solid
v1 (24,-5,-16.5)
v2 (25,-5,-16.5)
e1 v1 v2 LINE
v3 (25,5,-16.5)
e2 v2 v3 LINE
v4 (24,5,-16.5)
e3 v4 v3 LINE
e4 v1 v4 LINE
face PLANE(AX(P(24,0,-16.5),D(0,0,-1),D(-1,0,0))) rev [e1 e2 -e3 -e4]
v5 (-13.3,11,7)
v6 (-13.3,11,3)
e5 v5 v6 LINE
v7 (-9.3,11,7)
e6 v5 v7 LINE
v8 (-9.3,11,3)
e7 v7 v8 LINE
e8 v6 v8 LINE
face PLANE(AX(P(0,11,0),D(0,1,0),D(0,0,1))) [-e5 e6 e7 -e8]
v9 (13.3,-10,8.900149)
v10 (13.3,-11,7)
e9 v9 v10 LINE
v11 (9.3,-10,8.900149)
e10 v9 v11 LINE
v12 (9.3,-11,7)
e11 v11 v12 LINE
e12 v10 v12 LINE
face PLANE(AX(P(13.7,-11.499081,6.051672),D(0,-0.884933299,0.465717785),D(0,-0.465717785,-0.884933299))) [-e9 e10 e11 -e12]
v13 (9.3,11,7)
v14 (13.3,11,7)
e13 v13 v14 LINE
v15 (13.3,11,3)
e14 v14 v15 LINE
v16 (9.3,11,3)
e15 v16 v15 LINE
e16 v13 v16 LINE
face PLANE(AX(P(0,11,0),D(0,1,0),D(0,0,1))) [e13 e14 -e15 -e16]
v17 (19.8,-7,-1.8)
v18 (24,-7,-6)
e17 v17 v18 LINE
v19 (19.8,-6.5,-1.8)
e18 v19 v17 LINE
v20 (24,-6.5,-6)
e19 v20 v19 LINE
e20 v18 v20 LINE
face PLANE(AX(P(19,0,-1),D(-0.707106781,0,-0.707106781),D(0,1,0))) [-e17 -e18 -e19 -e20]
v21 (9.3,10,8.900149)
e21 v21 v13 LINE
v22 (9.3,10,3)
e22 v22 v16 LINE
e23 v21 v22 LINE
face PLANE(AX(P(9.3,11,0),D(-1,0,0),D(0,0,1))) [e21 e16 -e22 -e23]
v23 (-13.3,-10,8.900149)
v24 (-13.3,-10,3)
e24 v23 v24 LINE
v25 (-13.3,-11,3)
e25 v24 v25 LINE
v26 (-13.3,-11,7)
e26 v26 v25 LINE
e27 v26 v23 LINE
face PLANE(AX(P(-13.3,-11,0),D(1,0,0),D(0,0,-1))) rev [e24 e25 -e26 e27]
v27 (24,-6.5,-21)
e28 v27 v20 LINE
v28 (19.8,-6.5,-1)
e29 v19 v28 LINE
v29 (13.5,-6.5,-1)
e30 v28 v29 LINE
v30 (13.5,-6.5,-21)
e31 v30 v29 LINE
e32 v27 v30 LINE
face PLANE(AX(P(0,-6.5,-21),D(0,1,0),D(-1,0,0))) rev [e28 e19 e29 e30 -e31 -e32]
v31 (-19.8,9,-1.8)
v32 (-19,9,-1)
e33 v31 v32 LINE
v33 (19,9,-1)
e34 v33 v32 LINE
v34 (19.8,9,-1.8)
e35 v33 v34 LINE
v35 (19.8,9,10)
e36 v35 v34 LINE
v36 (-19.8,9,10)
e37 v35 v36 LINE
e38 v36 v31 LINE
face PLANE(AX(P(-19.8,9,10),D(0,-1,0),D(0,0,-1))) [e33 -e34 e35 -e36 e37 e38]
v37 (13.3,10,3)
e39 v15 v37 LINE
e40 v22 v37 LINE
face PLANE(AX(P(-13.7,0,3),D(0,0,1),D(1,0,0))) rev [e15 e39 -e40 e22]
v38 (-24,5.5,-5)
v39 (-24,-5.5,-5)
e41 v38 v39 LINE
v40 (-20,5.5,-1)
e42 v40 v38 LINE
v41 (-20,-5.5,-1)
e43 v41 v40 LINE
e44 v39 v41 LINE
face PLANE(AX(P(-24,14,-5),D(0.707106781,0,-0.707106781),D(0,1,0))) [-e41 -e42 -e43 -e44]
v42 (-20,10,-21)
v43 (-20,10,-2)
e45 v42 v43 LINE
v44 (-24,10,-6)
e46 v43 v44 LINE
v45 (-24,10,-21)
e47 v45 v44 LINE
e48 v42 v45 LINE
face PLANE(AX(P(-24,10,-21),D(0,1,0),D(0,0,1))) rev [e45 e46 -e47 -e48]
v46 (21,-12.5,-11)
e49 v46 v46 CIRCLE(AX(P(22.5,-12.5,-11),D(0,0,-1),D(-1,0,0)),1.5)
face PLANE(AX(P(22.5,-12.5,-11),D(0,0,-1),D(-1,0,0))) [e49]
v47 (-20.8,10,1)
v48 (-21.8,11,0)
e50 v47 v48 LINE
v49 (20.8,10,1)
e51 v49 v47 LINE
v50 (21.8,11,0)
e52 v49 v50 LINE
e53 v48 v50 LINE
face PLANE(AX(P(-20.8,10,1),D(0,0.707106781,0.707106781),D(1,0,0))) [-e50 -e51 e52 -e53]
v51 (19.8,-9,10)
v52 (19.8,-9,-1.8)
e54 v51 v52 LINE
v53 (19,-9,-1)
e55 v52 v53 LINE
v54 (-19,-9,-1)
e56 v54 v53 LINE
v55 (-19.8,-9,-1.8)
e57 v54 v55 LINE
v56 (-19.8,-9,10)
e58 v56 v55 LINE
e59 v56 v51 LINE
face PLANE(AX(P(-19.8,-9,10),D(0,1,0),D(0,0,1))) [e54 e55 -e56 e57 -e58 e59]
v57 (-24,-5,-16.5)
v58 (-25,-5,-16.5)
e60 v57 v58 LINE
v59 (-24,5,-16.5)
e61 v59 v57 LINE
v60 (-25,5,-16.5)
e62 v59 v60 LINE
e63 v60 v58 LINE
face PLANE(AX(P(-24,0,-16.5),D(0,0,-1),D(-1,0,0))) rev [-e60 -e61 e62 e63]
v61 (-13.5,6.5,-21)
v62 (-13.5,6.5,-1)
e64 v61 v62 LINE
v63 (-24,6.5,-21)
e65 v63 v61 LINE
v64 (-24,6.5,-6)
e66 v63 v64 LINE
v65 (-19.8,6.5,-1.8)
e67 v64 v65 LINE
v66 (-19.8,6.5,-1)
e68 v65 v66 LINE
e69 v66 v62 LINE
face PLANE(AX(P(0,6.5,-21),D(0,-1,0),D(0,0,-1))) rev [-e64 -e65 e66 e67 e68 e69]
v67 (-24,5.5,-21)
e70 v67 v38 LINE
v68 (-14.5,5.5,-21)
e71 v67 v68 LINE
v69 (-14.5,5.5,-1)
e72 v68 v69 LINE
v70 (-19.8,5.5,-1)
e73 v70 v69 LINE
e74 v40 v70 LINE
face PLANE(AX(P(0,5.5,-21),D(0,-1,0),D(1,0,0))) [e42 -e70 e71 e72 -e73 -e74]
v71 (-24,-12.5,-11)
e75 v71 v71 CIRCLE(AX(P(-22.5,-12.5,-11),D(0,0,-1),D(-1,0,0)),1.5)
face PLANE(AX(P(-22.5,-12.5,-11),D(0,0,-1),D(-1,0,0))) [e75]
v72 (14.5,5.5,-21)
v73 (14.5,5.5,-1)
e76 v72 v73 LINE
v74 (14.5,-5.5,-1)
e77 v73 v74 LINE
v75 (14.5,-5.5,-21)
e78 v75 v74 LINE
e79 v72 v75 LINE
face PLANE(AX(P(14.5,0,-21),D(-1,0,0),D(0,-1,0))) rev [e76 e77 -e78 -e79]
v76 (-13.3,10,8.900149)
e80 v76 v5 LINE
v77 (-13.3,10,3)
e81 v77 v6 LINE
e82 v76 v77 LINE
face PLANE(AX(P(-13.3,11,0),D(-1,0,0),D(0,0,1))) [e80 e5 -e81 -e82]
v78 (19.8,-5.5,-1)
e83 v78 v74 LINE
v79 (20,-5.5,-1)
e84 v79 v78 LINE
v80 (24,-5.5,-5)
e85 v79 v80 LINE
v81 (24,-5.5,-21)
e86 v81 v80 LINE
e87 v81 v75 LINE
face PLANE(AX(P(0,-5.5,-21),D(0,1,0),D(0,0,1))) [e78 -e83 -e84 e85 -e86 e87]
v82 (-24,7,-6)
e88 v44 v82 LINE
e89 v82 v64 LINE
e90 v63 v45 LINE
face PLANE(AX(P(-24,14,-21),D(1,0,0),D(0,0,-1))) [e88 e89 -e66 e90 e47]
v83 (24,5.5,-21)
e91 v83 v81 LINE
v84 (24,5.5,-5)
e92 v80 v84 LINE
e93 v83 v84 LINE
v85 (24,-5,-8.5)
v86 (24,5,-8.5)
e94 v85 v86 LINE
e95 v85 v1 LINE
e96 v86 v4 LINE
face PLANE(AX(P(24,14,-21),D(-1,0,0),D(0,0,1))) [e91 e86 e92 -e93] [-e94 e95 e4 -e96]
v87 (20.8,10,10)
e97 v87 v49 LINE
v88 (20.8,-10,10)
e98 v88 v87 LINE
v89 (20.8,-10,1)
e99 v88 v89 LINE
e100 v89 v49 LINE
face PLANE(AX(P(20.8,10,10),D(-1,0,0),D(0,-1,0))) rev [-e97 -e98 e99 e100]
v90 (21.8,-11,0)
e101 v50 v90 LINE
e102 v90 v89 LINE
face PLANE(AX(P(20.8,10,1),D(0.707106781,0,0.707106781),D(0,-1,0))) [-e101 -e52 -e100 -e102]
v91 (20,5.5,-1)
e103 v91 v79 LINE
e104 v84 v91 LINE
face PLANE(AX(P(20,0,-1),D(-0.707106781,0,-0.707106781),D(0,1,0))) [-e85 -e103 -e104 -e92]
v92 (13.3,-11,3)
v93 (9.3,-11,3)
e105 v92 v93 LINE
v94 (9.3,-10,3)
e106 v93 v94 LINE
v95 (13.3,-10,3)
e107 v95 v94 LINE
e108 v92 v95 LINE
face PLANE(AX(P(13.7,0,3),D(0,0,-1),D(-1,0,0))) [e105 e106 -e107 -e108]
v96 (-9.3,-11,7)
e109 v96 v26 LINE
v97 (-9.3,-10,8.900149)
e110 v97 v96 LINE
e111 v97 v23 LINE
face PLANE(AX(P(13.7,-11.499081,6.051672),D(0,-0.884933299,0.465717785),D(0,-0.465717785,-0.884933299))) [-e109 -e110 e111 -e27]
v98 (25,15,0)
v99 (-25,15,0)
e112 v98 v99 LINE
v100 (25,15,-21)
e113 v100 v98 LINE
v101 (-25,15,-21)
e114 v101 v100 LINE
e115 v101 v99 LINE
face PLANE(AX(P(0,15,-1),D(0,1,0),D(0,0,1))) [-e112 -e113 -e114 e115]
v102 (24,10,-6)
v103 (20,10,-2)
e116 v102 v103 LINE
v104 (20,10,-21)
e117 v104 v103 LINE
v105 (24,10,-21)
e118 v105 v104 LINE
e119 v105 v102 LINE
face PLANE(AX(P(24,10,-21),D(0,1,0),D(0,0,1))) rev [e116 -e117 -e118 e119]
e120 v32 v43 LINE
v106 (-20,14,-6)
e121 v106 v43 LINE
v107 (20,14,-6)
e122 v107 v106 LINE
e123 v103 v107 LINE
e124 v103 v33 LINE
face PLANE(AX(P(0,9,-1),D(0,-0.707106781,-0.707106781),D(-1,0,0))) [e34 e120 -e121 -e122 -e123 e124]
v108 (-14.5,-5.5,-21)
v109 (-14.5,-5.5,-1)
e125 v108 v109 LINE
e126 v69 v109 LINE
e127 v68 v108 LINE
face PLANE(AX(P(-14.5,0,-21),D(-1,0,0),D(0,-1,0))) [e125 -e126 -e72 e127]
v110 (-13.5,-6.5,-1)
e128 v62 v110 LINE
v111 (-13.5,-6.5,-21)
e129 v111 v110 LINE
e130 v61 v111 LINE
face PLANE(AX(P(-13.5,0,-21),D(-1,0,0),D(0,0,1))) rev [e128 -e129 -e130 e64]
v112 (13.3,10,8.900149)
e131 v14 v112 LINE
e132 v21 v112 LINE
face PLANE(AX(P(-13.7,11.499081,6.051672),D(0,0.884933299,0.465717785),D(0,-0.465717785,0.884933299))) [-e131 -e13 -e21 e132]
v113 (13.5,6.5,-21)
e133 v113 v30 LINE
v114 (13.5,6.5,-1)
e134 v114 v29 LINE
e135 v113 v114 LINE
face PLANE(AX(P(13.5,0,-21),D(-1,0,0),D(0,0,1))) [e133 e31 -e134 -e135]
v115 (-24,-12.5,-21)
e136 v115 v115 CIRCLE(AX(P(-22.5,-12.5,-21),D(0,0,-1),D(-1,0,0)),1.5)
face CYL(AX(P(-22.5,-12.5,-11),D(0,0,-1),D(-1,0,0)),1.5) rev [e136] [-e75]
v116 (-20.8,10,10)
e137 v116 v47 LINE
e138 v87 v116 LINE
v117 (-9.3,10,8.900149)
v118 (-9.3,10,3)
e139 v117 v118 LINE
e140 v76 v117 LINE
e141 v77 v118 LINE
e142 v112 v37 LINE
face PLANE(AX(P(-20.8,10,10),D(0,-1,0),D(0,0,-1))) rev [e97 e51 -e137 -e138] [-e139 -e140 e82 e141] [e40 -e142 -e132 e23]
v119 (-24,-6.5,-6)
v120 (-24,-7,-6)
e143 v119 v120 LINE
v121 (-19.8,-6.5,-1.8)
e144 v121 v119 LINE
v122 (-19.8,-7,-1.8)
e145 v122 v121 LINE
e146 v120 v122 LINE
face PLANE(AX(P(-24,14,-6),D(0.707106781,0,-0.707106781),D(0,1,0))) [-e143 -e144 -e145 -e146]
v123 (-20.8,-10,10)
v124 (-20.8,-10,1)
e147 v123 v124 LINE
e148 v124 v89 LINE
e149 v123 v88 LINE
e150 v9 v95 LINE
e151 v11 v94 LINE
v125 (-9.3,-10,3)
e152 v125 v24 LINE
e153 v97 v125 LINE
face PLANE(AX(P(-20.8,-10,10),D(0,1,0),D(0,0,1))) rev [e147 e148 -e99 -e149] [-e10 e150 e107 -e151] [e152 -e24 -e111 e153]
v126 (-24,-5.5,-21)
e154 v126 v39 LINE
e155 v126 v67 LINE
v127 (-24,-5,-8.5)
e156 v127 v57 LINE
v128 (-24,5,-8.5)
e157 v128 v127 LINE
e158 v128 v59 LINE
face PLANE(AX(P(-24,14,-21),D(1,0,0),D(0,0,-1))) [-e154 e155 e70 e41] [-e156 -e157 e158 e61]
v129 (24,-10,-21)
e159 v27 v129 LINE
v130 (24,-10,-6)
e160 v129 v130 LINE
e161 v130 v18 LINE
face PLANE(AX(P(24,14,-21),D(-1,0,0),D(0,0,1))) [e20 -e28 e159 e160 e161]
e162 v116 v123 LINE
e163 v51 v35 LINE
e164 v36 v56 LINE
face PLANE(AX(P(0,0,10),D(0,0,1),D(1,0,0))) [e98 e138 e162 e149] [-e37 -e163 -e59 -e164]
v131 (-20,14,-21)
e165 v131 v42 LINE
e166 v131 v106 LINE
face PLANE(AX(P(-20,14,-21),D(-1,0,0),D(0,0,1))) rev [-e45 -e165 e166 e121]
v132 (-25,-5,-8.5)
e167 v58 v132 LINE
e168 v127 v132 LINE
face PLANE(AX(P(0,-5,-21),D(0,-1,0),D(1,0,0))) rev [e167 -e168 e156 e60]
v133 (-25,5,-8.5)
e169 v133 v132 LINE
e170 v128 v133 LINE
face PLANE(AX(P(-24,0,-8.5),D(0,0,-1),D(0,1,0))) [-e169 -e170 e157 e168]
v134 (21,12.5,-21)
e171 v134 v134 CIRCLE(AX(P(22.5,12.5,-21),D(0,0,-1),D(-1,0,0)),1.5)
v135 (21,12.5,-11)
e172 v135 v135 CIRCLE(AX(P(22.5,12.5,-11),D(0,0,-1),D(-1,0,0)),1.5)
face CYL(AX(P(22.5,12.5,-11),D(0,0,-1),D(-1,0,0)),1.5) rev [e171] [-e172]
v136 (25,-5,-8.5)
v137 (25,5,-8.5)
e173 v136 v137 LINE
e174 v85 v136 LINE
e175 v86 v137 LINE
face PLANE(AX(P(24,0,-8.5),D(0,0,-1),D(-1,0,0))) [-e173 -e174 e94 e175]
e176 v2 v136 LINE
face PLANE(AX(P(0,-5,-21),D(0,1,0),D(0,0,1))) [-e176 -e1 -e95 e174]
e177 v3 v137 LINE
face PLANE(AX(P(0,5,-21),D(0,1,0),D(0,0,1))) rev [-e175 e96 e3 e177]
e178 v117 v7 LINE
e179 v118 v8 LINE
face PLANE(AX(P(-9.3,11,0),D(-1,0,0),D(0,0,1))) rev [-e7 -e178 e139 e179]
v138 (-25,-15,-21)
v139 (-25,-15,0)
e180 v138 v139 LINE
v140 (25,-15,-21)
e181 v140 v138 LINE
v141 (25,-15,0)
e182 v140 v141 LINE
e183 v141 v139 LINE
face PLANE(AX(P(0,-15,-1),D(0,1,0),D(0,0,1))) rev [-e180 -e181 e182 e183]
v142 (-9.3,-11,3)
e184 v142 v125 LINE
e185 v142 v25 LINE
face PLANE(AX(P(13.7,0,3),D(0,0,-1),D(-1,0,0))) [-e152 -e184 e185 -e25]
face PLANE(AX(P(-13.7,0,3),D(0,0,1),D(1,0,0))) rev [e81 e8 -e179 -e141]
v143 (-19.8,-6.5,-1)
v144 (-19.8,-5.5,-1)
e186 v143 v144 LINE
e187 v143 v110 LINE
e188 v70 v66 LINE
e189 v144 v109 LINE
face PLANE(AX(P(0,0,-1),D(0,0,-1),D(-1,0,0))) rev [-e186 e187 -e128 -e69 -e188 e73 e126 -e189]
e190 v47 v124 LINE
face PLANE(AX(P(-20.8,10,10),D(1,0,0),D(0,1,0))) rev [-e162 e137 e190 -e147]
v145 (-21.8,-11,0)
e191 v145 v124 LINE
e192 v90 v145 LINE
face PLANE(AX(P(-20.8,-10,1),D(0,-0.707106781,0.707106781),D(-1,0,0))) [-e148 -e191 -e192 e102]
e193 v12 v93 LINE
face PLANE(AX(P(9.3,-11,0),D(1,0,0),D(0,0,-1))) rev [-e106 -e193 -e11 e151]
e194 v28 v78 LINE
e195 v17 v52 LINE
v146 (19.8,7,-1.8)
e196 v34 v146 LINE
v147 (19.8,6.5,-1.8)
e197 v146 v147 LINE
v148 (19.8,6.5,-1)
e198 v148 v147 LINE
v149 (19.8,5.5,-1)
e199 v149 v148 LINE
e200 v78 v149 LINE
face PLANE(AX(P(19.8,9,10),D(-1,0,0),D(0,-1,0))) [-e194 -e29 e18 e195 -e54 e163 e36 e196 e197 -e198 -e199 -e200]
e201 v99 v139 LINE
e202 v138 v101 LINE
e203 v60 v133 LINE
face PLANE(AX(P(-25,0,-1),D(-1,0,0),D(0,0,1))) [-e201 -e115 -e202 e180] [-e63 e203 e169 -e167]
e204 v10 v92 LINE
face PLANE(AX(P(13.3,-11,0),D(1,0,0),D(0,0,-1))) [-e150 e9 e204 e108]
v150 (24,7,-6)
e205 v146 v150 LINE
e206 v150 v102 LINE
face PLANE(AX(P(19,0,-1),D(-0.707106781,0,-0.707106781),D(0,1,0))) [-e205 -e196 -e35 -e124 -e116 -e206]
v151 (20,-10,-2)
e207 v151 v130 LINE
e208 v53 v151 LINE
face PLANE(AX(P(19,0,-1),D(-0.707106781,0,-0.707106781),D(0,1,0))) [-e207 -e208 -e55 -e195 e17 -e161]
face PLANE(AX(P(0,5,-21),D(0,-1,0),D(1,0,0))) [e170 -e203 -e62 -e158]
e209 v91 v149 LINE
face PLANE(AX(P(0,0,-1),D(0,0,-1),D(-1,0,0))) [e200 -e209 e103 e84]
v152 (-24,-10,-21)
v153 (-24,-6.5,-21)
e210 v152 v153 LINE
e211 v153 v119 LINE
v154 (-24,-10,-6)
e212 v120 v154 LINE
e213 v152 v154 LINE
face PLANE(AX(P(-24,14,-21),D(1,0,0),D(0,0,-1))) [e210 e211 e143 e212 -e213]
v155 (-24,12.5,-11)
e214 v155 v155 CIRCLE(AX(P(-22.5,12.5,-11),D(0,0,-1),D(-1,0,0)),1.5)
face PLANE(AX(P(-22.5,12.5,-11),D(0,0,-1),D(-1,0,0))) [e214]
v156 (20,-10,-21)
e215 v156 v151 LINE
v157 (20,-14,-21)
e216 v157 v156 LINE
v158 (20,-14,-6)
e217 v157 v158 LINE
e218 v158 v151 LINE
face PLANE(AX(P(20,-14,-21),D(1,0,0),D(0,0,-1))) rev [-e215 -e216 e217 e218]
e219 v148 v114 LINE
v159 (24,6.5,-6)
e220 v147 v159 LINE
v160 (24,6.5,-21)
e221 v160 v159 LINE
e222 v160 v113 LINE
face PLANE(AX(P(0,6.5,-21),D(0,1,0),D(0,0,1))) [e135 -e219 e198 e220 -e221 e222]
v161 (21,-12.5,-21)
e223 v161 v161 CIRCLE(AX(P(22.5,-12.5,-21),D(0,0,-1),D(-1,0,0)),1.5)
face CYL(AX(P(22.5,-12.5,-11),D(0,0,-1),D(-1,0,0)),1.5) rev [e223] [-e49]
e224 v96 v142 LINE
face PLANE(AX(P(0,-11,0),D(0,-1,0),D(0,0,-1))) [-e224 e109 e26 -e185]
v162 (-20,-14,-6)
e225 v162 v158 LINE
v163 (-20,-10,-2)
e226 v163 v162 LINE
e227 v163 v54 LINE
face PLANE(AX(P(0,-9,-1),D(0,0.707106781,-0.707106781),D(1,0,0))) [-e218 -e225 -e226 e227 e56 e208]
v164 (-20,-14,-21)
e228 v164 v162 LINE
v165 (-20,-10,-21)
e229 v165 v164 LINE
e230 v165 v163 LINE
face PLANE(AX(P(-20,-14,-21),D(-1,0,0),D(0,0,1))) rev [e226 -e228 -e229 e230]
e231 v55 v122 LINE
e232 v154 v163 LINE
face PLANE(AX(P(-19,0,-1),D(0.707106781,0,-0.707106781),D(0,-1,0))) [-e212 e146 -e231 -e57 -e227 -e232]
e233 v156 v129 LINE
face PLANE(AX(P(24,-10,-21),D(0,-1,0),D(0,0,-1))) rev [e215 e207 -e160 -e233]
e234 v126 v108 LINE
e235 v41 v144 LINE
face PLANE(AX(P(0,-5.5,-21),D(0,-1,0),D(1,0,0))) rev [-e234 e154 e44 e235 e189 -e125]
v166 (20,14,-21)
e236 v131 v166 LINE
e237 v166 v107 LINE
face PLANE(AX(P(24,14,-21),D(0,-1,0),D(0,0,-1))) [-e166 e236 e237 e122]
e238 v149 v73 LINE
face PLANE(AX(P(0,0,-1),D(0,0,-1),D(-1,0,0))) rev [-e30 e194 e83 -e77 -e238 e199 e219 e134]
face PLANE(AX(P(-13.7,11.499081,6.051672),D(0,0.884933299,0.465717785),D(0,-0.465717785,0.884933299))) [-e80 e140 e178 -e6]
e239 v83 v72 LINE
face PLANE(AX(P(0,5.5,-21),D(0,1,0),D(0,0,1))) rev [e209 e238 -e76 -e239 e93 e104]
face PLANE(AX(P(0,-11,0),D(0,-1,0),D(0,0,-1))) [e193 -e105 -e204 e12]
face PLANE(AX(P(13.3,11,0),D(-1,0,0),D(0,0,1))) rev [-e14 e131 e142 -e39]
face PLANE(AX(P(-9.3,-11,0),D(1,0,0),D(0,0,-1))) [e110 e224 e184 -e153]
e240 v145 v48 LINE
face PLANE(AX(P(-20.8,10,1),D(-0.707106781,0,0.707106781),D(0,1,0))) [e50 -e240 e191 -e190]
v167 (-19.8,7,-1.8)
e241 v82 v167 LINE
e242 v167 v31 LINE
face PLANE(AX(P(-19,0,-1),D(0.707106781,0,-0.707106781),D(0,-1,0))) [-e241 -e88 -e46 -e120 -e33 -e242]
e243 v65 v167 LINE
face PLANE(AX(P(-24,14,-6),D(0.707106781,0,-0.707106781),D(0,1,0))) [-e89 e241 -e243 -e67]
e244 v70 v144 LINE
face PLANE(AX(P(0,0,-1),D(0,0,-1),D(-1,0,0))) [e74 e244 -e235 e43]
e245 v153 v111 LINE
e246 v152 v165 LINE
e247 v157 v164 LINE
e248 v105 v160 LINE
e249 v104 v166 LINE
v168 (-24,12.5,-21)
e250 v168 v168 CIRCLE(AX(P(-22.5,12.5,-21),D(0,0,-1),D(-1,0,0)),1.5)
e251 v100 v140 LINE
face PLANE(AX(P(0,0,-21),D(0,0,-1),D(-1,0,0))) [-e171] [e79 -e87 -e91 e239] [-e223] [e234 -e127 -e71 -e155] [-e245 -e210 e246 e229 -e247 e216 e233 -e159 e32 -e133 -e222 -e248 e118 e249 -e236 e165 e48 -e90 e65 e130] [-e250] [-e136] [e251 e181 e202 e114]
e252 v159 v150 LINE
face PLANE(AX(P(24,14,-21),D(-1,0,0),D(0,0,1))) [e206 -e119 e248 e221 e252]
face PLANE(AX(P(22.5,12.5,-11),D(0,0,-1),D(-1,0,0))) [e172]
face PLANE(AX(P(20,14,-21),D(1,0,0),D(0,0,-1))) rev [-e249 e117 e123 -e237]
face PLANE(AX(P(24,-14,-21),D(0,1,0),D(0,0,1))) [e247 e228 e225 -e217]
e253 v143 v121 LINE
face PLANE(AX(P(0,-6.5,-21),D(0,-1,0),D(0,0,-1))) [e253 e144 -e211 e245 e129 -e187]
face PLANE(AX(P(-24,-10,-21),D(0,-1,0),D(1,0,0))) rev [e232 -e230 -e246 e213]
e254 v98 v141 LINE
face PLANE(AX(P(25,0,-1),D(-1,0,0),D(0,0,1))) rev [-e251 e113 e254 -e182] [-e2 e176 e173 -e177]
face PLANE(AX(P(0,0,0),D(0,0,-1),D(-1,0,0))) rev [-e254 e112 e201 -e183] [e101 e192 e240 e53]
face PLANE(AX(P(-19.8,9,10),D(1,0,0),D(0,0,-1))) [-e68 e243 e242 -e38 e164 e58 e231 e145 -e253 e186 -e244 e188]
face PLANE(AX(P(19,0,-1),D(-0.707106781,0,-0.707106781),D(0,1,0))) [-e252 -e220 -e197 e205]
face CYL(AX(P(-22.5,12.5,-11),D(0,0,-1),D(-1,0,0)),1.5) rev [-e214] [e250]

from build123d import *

# Parameters (mm, degrees)
SKETCH1_W            = 41.6
SKETCH1_H            = 20
SKETCH1_W_2          = 39.6
SKETCH1_H_2          = 18
BOSS_EXTRUDE2_DEPTH  = 10
SKETCH2_W            = 4
SKETCH2_H            = 10
BOSS_EXTRUDE3_DEPTH  = 1
SKETCH3_W            = 3
SKETCH3_H            = 1
CUT_EXTRUDE1_DEPTH   = 27
SKETCH4_W            = 4
SKETCH4_H            = 10
BOSS_EXTRUDE4_DEPTH  = 1
SKETCH5_W            = 3
SKETCH5_H            = 1
CUT_EXTRUDE2_DEPTH   = 27
SKETCH6_W            = 50
SKETCH6_H            = 30
SKETCH6_W_2          = 41.6
SKETCH6_H_2          = 20
SKETCH6_W_3          = 39.6
SKETCH6_H_3          = 18
BOSS_EXTRUDE6_DEPTH  = 1
CHAMFER1_SIZE        = 1
SKETCH7_W            = 50
SKETCH7_H            = 30
SKETCH7_W_2          = 48
SKETCH7_H_2          = 28
BOSS_EXTRUDE7_DEPTH  = 20
SKETCH8_W            = 4.2
SKETCH8_H            = 1
BOSS_EXTRUDE8_DEPTH  = 20
SKETCH9_W            = 4.2
SKETCH9_H            = 1
BOSS_EXTRUDE9_DEPTH  = 20
SKETCH10_W           = 4
SKETCH10_H           = 4
BOSS_EXTRUDE10_DEPTH = 20
SKETCH11_W           = 2
SKETCH11_H           = 10
CUT_EXTRUDE3_DEPTH   = 1
SKETCH12_W           = 2
SKETCH12_H           = 10
CUT_EXTRUDE4_DEPTH   = 1
SKETCH13_R           = 1.5
CUT_EXTRUDE5_DEPTH   = 10
CHAMFER2_SIZE        = 5
CHAMFER3_SIZE        = 5
CHAMFER4_SIZE        = 4
SKETCH17_W           = 20
SKETCH17_H           = 14
CUT_EXTRUDE8_DEPTH   = 10
SKETCH18_W           = 4.2
SKETCH18_H           = 1
BOSS_EXTRUDE11_DEPTH = 20
CHAMFER5_SIZE        = 5
CHAMFER6_SIZE        = 5
CHAMFER7_SIZE        = 4
SKETCH19_W           = 20
SKETCH19_H           = 14
CUT_EXTRUDE9_DEPTH   = 10
SKETCH20_W           = 4.2
SKETCH20_H           = 1
BOSS_EXTRUDE12_DEPTH = 20
CHAMFER8_SIZE        = 4
CHAMFER9_SIZE        = 5


# Some blends are built 0.0001 mm under size
with BuildPart() as part:
    # Sketch1 → Boss-Extrude2 (new body)
    with BuildSketch(Plane.XY):
        Rectangle(SKETCH1_W, SKETCH1_H)
        Rectangle(SKETCH1_W_2, SKETCH1_H_2, mode=Mode.SUBTRACT)
    extrude(amount=BOSS_EXTRUDE2_DEPTH)

    # Sketch2 → Boss-Extrude3 (add)
    with BuildSketch(Plane.XZ.offset(10)):
        with Locations((-11.3, 5)):
            Rectangle(SKETCH2_W, SKETCH2_H)
        with Locations((11.3, 5)):
            Rectangle(SKETCH2_W, SKETCH2_H)
    extrude(amount=BOSS_EXTRUDE3_DEPTH)

    # Sketch3 → Cut-Extrude1 (cut)
    with BuildSketch(Plane.ZY.offset(13.3)):
        Polygon((8.900149248, -10), (7, -11), (10, -11), (10, -10), align=None)
        with Locations((1.5, -10.5)):
            Rectangle(SKETCH3_W, SKETCH3_H)
    extrude(amount=-CUT_EXTRUDE1_DEPTH, mode=Mode.SUBTRACT)

    # Sketch4 → Boss-Extrude4 (add)
    with BuildSketch(Plane(origin=(0, 10, 0), x_dir=(1, 0, 0), z_dir=(0, 1, 0))):
        with Locations((11.3, -5)):
            Rectangle(SKETCH4_W, SKETCH4_H)
        with Locations((-11.3, -5)):
            Rectangle(SKETCH4_W, SKETCH4_H)
    extrude(amount=BOSS_EXTRUDE4_DEPTH)

    # Sketch5 → Cut-Extrude2 (cut)
    with BuildSketch(Plane(origin=(13.3, 0, 0), x_dir=(0, 0, -1), z_dir=(1, 0, 0))):
        Polygon((-7, 11), (-10, 11), (-10, 10), (-8.900149248, 10), align=None)
        with Locations((-1.5, 10.5)):
            Rectangle(SKETCH5_W, SKETCH5_H)
    extrude(amount=-CUT_EXTRUDE2_DEPTH, mode=Mode.SUBTRACT)

    # Sketch6 → Boss-Extrude6 (add)
    # profile 1 of 2: a face of its own
    with BuildSketch(Plane(origin=(0, 0, 0), x_dir=(-1, 0, 0), z_dir=(0, 0, -1))):
        Rectangle(SKETCH6_W, SKETCH6_H)
        Rectangle(SKETCH6_W_2, SKETCH6_H_2, mode=Mode.SUBTRACT)
    # profile 2 of 2: a face of its own
    with BuildSketch(Plane(origin=(0, 0, 0), x_dir=(-1, 0, 0), z_dir=(0, 0, -1))):
        Rectangle(SKETCH6_W_2, SKETCH6_H_2)
        Rectangle(SKETCH6_W_3, SKETCH6_H_3, mode=Mode.SUBTRACT)
    extrude(amount=BOSS_EXTRUDE6_DEPTH)

    # Chamfer1
    chamfer1_edges = [part.edges().sort_by_distance(p)[0] for p in [
        (0, -10, 0),
        (-20.8, 0, 0),
        (0, 10, 0),
        (20.8, 0, 0),
    ]]
    chamfer(chamfer1_edges, length=CHAMFER1_SIZE)

    # Sketch7 → Boss-Extrude7 (add)
    with BuildSketch(Plane(origin=(0, 0, -1), x_dir=(-1, 0, 0), z_dir=(0, 0, -1))):
        Rectangle(SKETCH7_W, SKETCH7_H)
        Rectangle(SKETCH7_W_2, SKETCH7_H_2, mode=Mode.SUBTRACT)
    extrude(amount=BOSS_EXTRUDE7_DEPTH)

    # Sketch8 → Boss-Extrude8 (add)
    with BuildSketch(Plane(origin=(0, 0, -1), x_dir=(-1, 0, 0), z_dir=(0, 0, -1))):
        Polygon((-15, -5), (-19.8, -5), (-19.8, -6), (-14, -6), (-14, 6), (-19.8, 6), (-19.8, 5), (-15, 5), align=None)
        with Locations((-21.9, 5.5)):
            Rectangle(SKETCH8_W, SKETCH8_H)
        with Locations((-21.9, -5.5)):
            Rectangle(SKETCH8_W, SKETCH8_H)
    extrude(amount=BOSS_EXTRUDE8_DEPTH)

    # Sketch9 → Boss-Extrude9 (add)
    with BuildSketch(Plane(origin=(0, 0, -1), x_dir=(-1, 0, 0), z_dir=(0, 0, -1))):
        Polygon((15, 5), (19.8, 5), (19.8, 6), (14, 6), (14, -6), (19.8, -6), (19.8, -5), (15, -5), align=None)
        with Locations((21.9, 5.5)):
            Rectangle(SKETCH9_W, SKETCH9_H)
        with Locations((21.9, -5.5)):
            Rectangle(SKETCH9_W, SKETCH9_H)
    extrude(amount=BOSS_EXTRUDE9_DEPTH)

    # Sketch10 → Boss-Extrude10 (add)
    with BuildSketch(Plane(origin=(0, 0, -1), x_dir=(-1, 0, 0), z_dir=(0, 0, -1))):
        with Locations((-22, 12)):
            Rectangle(SKETCH10_W, SKETCH10_H)
        with Locations((22, 12)):
            Rectangle(SKETCH10_W, SKETCH10_H)
        with Locations((22, -12)):
            Rectangle(SKETCH10_W, SKETCH10_H)
        with Locations((-22, -12)):
            Rectangle(SKETCH10_W, SKETCH10_H)
    extrude(amount=BOSS_EXTRUDE10_DEPTH)

    # Sketch11 → Cut-Extrude3 (cut)
    with BuildSketch(Plane.ZY.offset(25)):
        Polygon((-10.5, -5), (-10.5, 5), (-16.5, 5), (-16.5, 0), (-16.5, -5), align=None)
        with Locations((-9.5, 0)):
            Rectangle(SKETCH11_W, SKETCH11_H)
    extrude(amount=-CUT_EXTRUDE3_DEPTH, mode=Mode.SUBTRACT)

    # Sketch12 → Cut-Extrude4 (cut)
    with BuildSketch(Plane(origin=(25, 0, 0), x_dir=(0, 0, -1), z_dir=(1, 0, 0))):
        with Locations((9.5, 0)):
            Rectangle(SKETCH12_W, SKETCH12_H)
        Polygon((16.5, 5), (10.5, 5), (10.5, -5), (16.5, -5), (16.5, 0), align=None)
    extrude(amount=-CUT_EXTRUDE4_DEPTH, mode=Mode.SUBTRACT)

    # Sketch13 → Cut-Extrude5 (cut)
    with BuildSketch(Plane(origin=(0, 0, -21), x_dir=(-1, 0, 0), z_dir=(0, 0, -1))):
        with Locations((-22.5, 12.5)):
            Circle(SKETCH13_R)
        with Locations((22.5, 12.5)):
            Circle(SKETCH13_R)
        with Locations((22.5, -12.5)):
            Circle(SKETCH13_R)
        with Locations((-22.5, -12.5)):
            Circle(SKETCH13_R)
    extrude(amount=-CUT_EXTRUDE5_DEPTH, mode=Mode.SUBTRACT)

    # Chamfer2
    chamfer2_edges = [part.edges().sort_by_distance(p)[0] for p in [
        (0, -14, -1),
        (0, 14, -1),
    ]]
    chamfer(chamfer2_edges, length=CHAMFER2_SIZE - 0.0001)  # a hair under: the kernel refuses the full size

    # Chamfer3
    # the kernel refuses this chamfer: 5 mm, written as the material it adds along each edge
    with BuildSketch(Plane(origin=(24, -21.85851494, -1), x_dir=(-0.9996219169112968, 0, 0.02749587661058636), z_dir=(0, 1, 0))) as chamfer3_piece_1_section:
        Polygon((CHAMFER3_SIZE * 0.999621916911, -CHAMFER3_SIZE * 0.0274958766106), (-CHAMFER3_SIZE * 0.0274958766106, -CHAMFER3_SIZE * 0.999621916911), (0, 0), align=None)
    chamfer3_piece_1 = extrude(amount=28.71692988, mode=Mode.PRIVATE)
    chamfer3_piece_1 = split(chamfer3_piece_1, bisect_by=Plane(origin=(19.8, -10.000025, -1.99995), z_dir=(1, 0, 0)), keep=Keep.TOP, mode=Mode.PRIVATE)
    chamfer3_piece_1 = split(chamfer3_piece_1, bisect_by=Plane(origin=(19.999975, -5, -1.99995), z_dir=(0, -1, 0)), keep=Keep.TOP, mode=Mode.PRIVATE)
    chamfer3_piece_1 = split(chamfer3_piece_1, bisect_by=Plane(origin=(19.999975, -10.0000375, -1.9999375), z_dir=(0, 0.7071067811865476, -0.7071067811865476)), keep=Keep.TOP, mode=Mode.PRIVATE)
    add(chamfer3_piece_1)
    with BuildSketch(Plane(origin=(24, -21.85851494, -1), x_dir=(-0.9996219169112968, 0, 0.02749587661058636), z_dir=(0, 1, 0))) as chamfer3_piece_2_section:
        Polygon((CHAMFER3_SIZE * 0.999621916911, -CHAMFER3_SIZE * 0.0274958766106), (-CHAMFER3_SIZE * 0.0274958766106, -CHAMFER3_SIZE * 0.999621916911), (0, 0), align=None)
    chamfer3_piece_2 = extrude(amount=28.71692988, mode=Mode.PRIVATE)
    chamfer3_piece_2 = split(chamfer3_piece_2, bisect_by=Plane(origin=(19.599975009, -9, -1.399950019), z_dir=(0, -1, 0)), keep=Keep.TOP, mode=Mode.PRIVATE)
    chamfer3_piece_2 = split(chamfer3_piece_2, bisect_by=Plane(origin=(19.599975009, -9.300037514, -1.299937514), z_dir=(0, 0.7071067811865476, -0.7071067811865476)), keep=Keep.TOP, mode=Mode.PRIVATE)
    add(chamfer3_piece_2)
    with BuildSketch(Plane(origin=(24, -21.85851494, -1), x_dir=(-0.9996219169112968, 0, 0.02749587661058636), z_dir=(0, 1, 0))) as chamfer3_piece_3_section:
        Polygon((CHAMFER3_SIZE * 0.999621916911, -CHAMFER3_SIZE * 0.0274958766106), (-CHAMFER3_SIZE * 0.0274958766106, -CHAMFER3_SIZE * 0.999621916911), (0, 0), align=None)
    chamfer3_piece_3 = extrude(amount=28.71692988, mode=Mode.PRIVATE)
    chamfer3_piece_3 = split(chamfer3_piece_3, bisect_by=Plane(origin=(19.8, 6.42920747, -1.451851852), z_dir=(1, 0, 0)), keep=Keep.TOP, mode=Mode.PRIVATE)
    chamfer3_piece_3 = split(chamfer3_piece_3, bisect_by=Plane(origin=(19.903703704, 5, -1.451851852), z_dir=(0, 1, 0)), keep=Keep.TOP, mode=Mode.PRIVATE)
    add(chamfer3_piece_3)
    with BuildSketch(Plane(origin=(-24, 6.85841494, -1), x_dir=(0.9996219169112968, 0, 0.02749587661058636), z_dir=(0, -1, 0))) as chamfer3_piece_4_section:
        Polygon((CHAMFER3_SIZE * 0.999621916911, -CHAMFER3_SIZE * 0.0274958766106), (-CHAMFER3_SIZE * 0.0274958766106, -CHAMFER3_SIZE * 0.999621916911), (0, 0), align=None)
    chamfer3_piece_4 = extrude(amount=28.71692988, mode=Mode.PRIVATE)
    chamfer3_piece_4 = split(chamfer3_piece_4, bisect_by=Plane(origin=(-19.8, 6.42920747, -1.451851852), z_dir=(-1, 0, 0)), keep=Keep.TOP, mode=Mode.PRIVATE)
    chamfer3_piece_4 = split(chamfer3_piece_4, bisect_by=Plane(origin=(-19.903703704, 5, -1.451851852), z_dir=(0, 1, 0)), keep=Keep.TOP, mode=Mode.PRIVATE)
    add(chamfer3_piece_4)
    with BuildSketch(Plane(origin=(-24, -6, -1), x_dir=(0.9996219169112968, 0, 0.02749587661058636), z_dir=(0, -1, 0))) as chamfer3_piece_5_section:
        Polygon((CHAMFER3_SIZE * 0.999621916911, -CHAMFER3_SIZE * 0.0274958766106), (-CHAMFER3_SIZE * 0.0274958766106, -CHAMFER3_SIZE * 0.999621916911), (0, 0), align=None)
    chamfer3_piece_5 = extrude(amount=15.85851494, mode=Mode.PRIVATE)
    chamfer3_piece_5 = split(chamfer3_piece_5, bisect_by=Plane(origin=(-19.8, -7.5, -1.451851852), z_dir=(-1, 0, 0)), keep=Keep.TOP, mode=Mode.PRIVATE)
    chamfer3_piece_5 = split(chamfer3_piece_5, bisect_by=Plane(origin=(-19.903703704, -8.475975926, -0.475875926), z_dir=(0, 0.7071067811865476, -0.7071067811865476)), keep=Keep.TOP, mode=Mode.PRIVATE)
    add(chamfer3_piece_5)
    with BuildSketch(Plane(origin=(-24, 6.85841494, -1), x_dir=(0.9996219169112968, 0, 0.02749587661058636), z_dir=(0, -1, 0))) as chamfer3_piece_6_section:
        Polygon((CHAMFER3_SIZE * 0.999621916911, -CHAMFER3_SIZE * 0.0274958766106), (-CHAMFER3_SIZE * 0.0274958766106, -CHAMFER3_SIZE * 0.999621916911), (0, 0), align=None)
    chamfer3_piece_6 = extrude(amount=28.71692988, mode=Mode.PRIVATE)
    chamfer3_piece_6 = split(chamfer3_piece_6, bisect_by=Plane(origin=(-19.599975009, -9, -1.399950019), z_dir=(0, -1, 0)), keep=Keep.TOP, mode=Mode.PRIVATE)
    chamfer3_piece_6 = split(chamfer3_piece_6, bisect_by=Plane(origin=(-19.599975009, -9.300037514, -1.299937514), z_dir=(0, 0.7071067811865476, -0.7071067811865476)), keep=Keep.TOP, mode=Mode.PRIVATE)
    add(chamfer3_piece_6)
    with BuildSketch(Plane(origin=(-24, 21.85851494, -1), x_dir=(0.9996219169112968, 0, 0.02749587661058636), z_dir=(0, -1, 0))) as chamfer3_piece_7_section:
        Polygon((CHAMFER3_SIZE * 0.999621916911, -CHAMFER3_SIZE * 0.0274958766106), (-CHAMFER3_SIZE * 0.0274958766106, -CHAMFER3_SIZE * 0.999621916911), (0, 0), align=None)
    chamfer3_piece_7 = extrude(amount=28.71692988, mode=Mode.PRIVATE)
    chamfer3_piece_7 = split(chamfer3_piece_7, bisect_by=Plane(origin=(-19.8, 10.000025, -1.99995), z_dir=(-1, 0, 0)), keep=Keep.TOP, mode=Mode.PRIVATE)
    chamfer3_piece_7 = split(chamfer3_piece_7, bisect_by=Plane(origin=(-19.999975, 15, -1.99995), z_dir=(0, -1, 0)), keep=Keep.TOP, mode=Mode.PRIVATE)
    chamfer3_piece_7 = split(chamfer3_piece_7, bisect_by=Plane(origin=(-19.999975, 5, -1.99995), z_dir=(0, 1, 0)), keep=Keep.TOP, mode=Mode.PRIVATE)
    add(chamfer3_piece_7)
    with BuildSketch(Plane(origin=(-24, 21.85851494, -1), x_dir=(0.9996219169112968, 0, 0.02749587661058636), z_dir=(0, -1, 0))) as chamfer3_piece_8_section:
        Polygon((CHAMFER3_SIZE * 0.999621916911, -CHAMFER3_SIZE * 0.0274958766106), (-CHAMFER3_SIZE * 0.0274958766106, -CHAMFER3_SIZE * 0.999621916911), (0, 0), align=None)
    chamfer3_piece_8 = extrude(amount=28.71692988, mode=Mode.PRIVATE)
    chamfer3_piece_8 = split(chamfer3_piece_8, bisect_by=Plane(origin=(-19.599975009, 9, -1.399950019), z_dir=(0, 1, 0)), keep=Keep.TOP, mode=Mode.PRIVATE)
    chamfer3_piece_8 = split(chamfer3_piece_8, bisect_by=Plane(origin=(-19.599975009, 15, -1.399950019), z_dir=(0, -1, 0)), keep=Keep.TOP, mode=Mode.PRIVATE)
    add(chamfer3_piece_8)
    with BuildSketch(Plane(origin=(-24, 21.85851494, -1), x_dir=(0.9996219169112968, 0, 0.02749587661058636), z_dir=(0, -1, 0))) as chamfer3_piece_9_section:
        Polygon((CHAMFER3_SIZE * 0.999621916911, -CHAMFER3_SIZE * 0.0274958766106), (-CHAMFER3_SIZE * 0.0274958766106, -CHAMFER3_SIZE * 0.999621916911), (0, 0), align=None)
    chamfer3_piece_9 = extrude(amount=28.71692988, mode=Mode.PRIVATE)
    chamfer3_piece_9 = split(chamfer3_piece_9, bisect_by=Plane(origin=(-19.8, -6.42920747, -1.451851852), z_dir=(-1, 0, 0)), keep=Keep.TOP, mode=Mode.PRIVATE)
    chamfer3_piece_9 = split(chamfer3_piece_9, bisect_by=Plane(origin=(-19.903703704, -6, -1.451851852), z_dir=(0, -1, 0)), keep=Keep.TOP, mode=Mode.PRIVATE)
    add(chamfer3_piece_9)
    with BuildSketch(Plane(origin=(24, -6.85841494, -1), x_dir=(-0.9996219169112968, 0, 0.02749587661058636), z_dir=(0, 1, 0))) as chamfer3_piece_10_section:
        Polygon((CHAMFER3_SIZE * 0.999621916911, -CHAMFER3_SIZE * 0.0274958766106), (-CHAMFER3_SIZE * 0.0274958766106, -CHAMFER3_SIZE * 0.999621916911), (0, 0), align=None)
    chamfer3_piece_10 = extrude(amount=28.71692988, mode=Mode.PRIVATE)
    chamfer3_piece_10 = split(chamfer3_piece_10, bisect_by=Plane(origin=(19.8, -6.42920747, -1.451851852), z_dir=(1, 0, 0)), keep=Keep.TOP, mode=Mode.PRIVATE)
    chamfer3_piece_10 = split(chamfer3_piece_10, bisect_by=Plane(origin=(19.903703704, -5, -1.451851852), z_dir=(0, -1, 0)), keep=Keep.TOP, mode=Mode.PRIVATE)
    add(chamfer3_piece_10)
    with BuildSketch(Plane(origin=(24, -6.85841494, -1), x_dir=(-0.9996219169112968, 0, 0.02749587661058636), z_dir=(0, 1, 0))) as chamfer3_piece_11_section:
        Polygon((CHAMFER3_SIZE * 0.999621916911, -CHAMFER3_SIZE * 0.0274958766106), (-CHAMFER3_SIZE * 0.0274958766106, -CHAMFER3_SIZE * 0.999621916911), (0, 0), align=None)
    chamfer3_piece_11 = extrude(amount=28.71692988, mode=Mode.PRIVATE)
    chamfer3_piece_11 = split(chamfer3_piece_11, bisect_by=Plane(origin=(19.8, 7.5, -1.451851852), z_dir=(1, 0, 0)), keep=Keep.TOP, mode=Mode.PRIVATE)
    chamfer3_piece_11 = split(chamfer3_piece_11, bisect_by=Plane(origin=(19.903703704, 15, -1.451851852), z_dir=(0, -1, 0)), keep=Keep.TOP, mode=Mode.PRIVATE)
    chamfer3_piece_11 = split(chamfer3_piece_11, bisect_by=Plane(origin=(19.903703704, 5, -1.451851852), z_dir=(0, 1, 0)), keep=Keep.TOP, mode=Mode.PRIVATE)
    add(chamfer3_piece_11)
    with BuildSketch(Plane(origin=(24, -6.85841494, -1), x_dir=(-0.9996219169112968, 0, 0.02749587661058636), z_dir=(0, 1, 0))) as chamfer3_piece_12_section:
        Polygon((CHAMFER3_SIZE * 0.999621916911, -CHAMFER3_SIZE * 0.0274958766106), (-CHAMFER3_SIZE * 0.0274958766106, -CHAMFER3_SIZE * 0.999621916911), (0, 0), align=None)
    chamfer3_piece_12 = extrude(amount=28.71692988, mode=Mode.PRIVATE)
    chamfer3_piece_12 = split(chamfer3_piece_12, bisect_by=Plane(origin=(19.599975009, 9, -1.399950019), z_dir=(0, 1, 0)), keep=Keep.TOP, mode=Mode.PRIVATE)
    chamfer3_piece_12 = split(chamfer3_piece_12, bisect_by=Plane(origin=(19.599975009, 15, -1.399950019), z_dir=(0, -1, 0)), keep=Keep.TOP, mode=Mode.PRIVATE)
    add(chamfer3_piece_12)

    # Chamfer4
    chamfer4_edges = [part.edges().sort_by_distance(p)[0] for p in [
        (24, 0, -1),
        (-24, 0, -1),
    ]]
    chamfer(chamfer4_edges, length=CHAMFER4_SIZE)

    # Sketch17 → Cut-Extrude8 (cut)
    with BuildSketch(Plane.ZY.offset(-14)):
        with Locations((-11, 0)):
            Rectangle(SKETCH17_W, SKETCH17_H)
    extrude(amount=-CUT_EXTRUDE8_DEPTH, mode=Mode.SUBTRACT)

    # Sketch18 → Boss-Extrude11 (add)
    with BuildSketch(Plane(origin=(0, 0, -1), x_dir=(-1, 0, 0), z_dir=(0, 0, -1))):
        Polygon((-19.8, 6.5), (-19.8, 5.5), (-14.5, 5.5), (-14.5, -5.5), (-19.8, -5.5), (-19.8, -6.5), (-13.5, -6.5), (-13.5, 6.5), align=None)
        with Locations((-21.9, 6)):
            Rectangle(SKETCH18_W, SKETCH18_H)
        with Locations((-21.9, -6)):
            Rectangle(SKETCH18_W, SKETCH18_H)
    extrude(amount=BOSS_EXTRUDE11_DEPTH)

    # Chamfer5
    # the kernel refuses this chamfer: 5 mm, written as the material it adds along each edge
    with BuildSketch(Plane(origin=(24, 19.85841494, -1), x_dir=(-0.9996219169112968, 0, 0.02749587661058636), z_dir=(0, -1, 0))) as chamfer5_piece_1_section:
        Polygon((CHAMFER5_SIZE * 0.999621916911, CHAMFER5_SIZE * 0.0274958766106), (-CHAMFER5_SIZE * 0.0274958766106, CHAMFER5_SIZE * 0.999621916911), (0, 0), align=None)
    chamfer5_piece_1 = extrude(amount=13.35841494, mode=Mode.PRIVATE)
    chamfer5_piece_1 = split(chamfer5_piece_1, bisect_by=Plane(origin=(19.8, 10.000025, -1.99995), z_dir=(1, 0, 0)), keep=Keep.TOP, mode=Mode.PRIVATE)
    chamfer5_piece_1 = split(chamfer5_piece_1, bisect_by=Plane(origin=(19.999975, 15, -1.99995), z_dir=(0, -1, 0)), keep=Keep.TOP, mode=Mode.PRIVATE)
    add(chamfer5_piece_1)

    # Chamfer6
    # the kernel refuses this chamfer: 5 mm, written as the material it adds along each edge
    with BuildSketch(Plane(origin=(24, 6.35841494, -1), x_dir=(0.027495876610586317, 0, -0.9996219169112968), z_dir=(0, -1, 0))) as chamfer6_piece_1_section:
        Polygon((CHAMFER6_SIZE * 0.999621916911, -CHAMFER6_SIZE * 0.0274958766106), (-CHAMFER6_SIZE * 0.0274958766106, -CHAMFER6_SIZE * 0.999621916911), (0, 0), align=None)
    chamfer6_piece_1 = extrude(amount=26.21682988, mode=Mode.PRIVATE)
    chamfer6_piece_1 = split(chamfer6_piece_1, bisect_by=Plane(origin=(19.8, -6.75, -2.722222222), z_dir=(1, 0, 0)), keep=Keep.TOP, mode=Mode.PRIVATE)
    chamfer6_piece_1 = split(chamfer6_piece_1, bisect_by=Plane(origin=(22.444444444, -15, -2.722222222), z_dir=(0, 1, 0)), keep=Keep.TOP, mode=Mode.PRIVATE)
    chamfer6_piece_1 = split(chamfer6_piece_1, bisect_by=Plane(origin=(22.444444444, -5.5, -2.722222222), z_dir=(0, -1, 0)), keep=Keep.TOP, mode=Mode.PRIVATE)
    add(chamfer6_piece_1)

    # Chamfer7
    chamfer7_edges = [part.edges().sort_by_distance(p)[0] for p in [
        (24, 0, -1),
    ]]
    chamfer(chamfer7_edges, length=CHAMFER7_SIZE)

    # Sketch19 → Cut-Extrude9 (cut)
    with BuildSketch(Plane(origin=(-14, 0, 0), x_dir=(0, 0, -1), z_dir=(1, 0, 0))):
        with Locations((11, 0)):
            Rectangle(SKETCH19_W, SKETCH19_H)
    extrude(amount=-CUT_EXTRUDE9_DEPTH, mode=Mode.SUBTRACT)

    # Sketch20 → Boss-Extrude12 (add)
    with BuildSketch(Plane(origin=(0, 0, -1), x_dir=(-1, 0, 0), z_dir=(0, 0, -1))):
        Polygon((14.5, 5.5), (19.8, 5.5), (19.8, 6.5), (13.5, 6.5), (13.5, -6.5), (19.8, -6.5), (19.8, -5.5), (14.5, -5.5), align=None)
        with Locations((21.9, 6)):
            Rectangle(SKETCH20_W, SKETCH20_H)
        with Locations((21.9, -6)):
            Rectangle(SKETCH20_W, SKETCH20_H)
    extrude(amount=BOSS_EXTRUDE12_DEPTH)

    # Chamfer8
    chamfer8_edges = [part.edges().sort_by_distance(p)[0] for p in [
        (-24, 0, -1),
    ]]
    chamfer(chamfer8_edges, length=CHAMFER8_SIZE)

    # Chamfer9
    # the kernel refuses this chamfer: 5 mm, written as the material it adds along each edge
    with BuildSketch(Plane(origin=(-24, -19.85841494, -1), x_dir=(-0.027495876610586317, 0, -0.9996219169112968), z_dir=(0, 1, 0))) as chamfer9_piece_1_section:
        Polygon((CHAMFER9_SIZE * 0.999621916911, -CHAMFER9_SIZE * 0.0274958766106), (-CHAMFER9_SIZE * 0.0274958766106, -CHAMFER9_SIZE * 0.999621916911), (0, 0), align=None)
    chamfer9_piece_1 = extrude(amount=13.35841494, mode=Mode.PRIVATE)
    chamfer9_piece_1 = split(chamfer9_piece_1, bisect_by=Plane(origin=(-19.8, -10.000025, -1.99995), z_dir=(-1, 0, 0)), keep=Keep.TOP, mode=Mode.PRIVATE)
    chamfer9_piece_1 = split(chamfer9_piece_1, bisect_by=Plane(origin=(-19.999975, -10.0000375, -1.9999375), z_dir=(0, 0.7071067811865476, -0.7071067811865476)), keep=Keep.TOP, mode=Mode.PRIVATE)
    add(chamfer9_piece_1)
    with BuildSketch(Plane(origin=(-24, 6.5, -1), x_dir=(-0.027495876610586317, 0, -0.9996219169112968), z_dir=(0, 1, 0))) as chamfer9_piece_2_section:
        Polygon((CHAMFER9_SIZE * 0.999621916911, -CHAMFER9_SIZE * 0.0274958766106), (-CHAMFER9_SIZE * 0.0274958766106, -CHAMFER9_SIZE * 0.999621916911), (0, 0), align=None)
    chamfer9_piece_2 = extrude(amount=13.35841494, mode=Mode.PRIVATE)
    chamfer9_piece_2 = split(chamfer9_piece_2, bisect_by=Plane(origin=(-19.8, 6.75, -3.5), z_dir=(-1, 0, 0)), keep=Keep.TOP, mode=Mode.PRIVATE)
    chamfer9_piece_2 = split(chamfer9_piece_2, bisect_by=Plane(origin=(-22, 9.12505, -1.12495), z_dir=(0, -0.7071067811865476, -0.7071067811865476)), keep=Keep.TOP, mode=Mode.PRIVATE)
    add(chamfer9_piece_2)


solid = part.part
